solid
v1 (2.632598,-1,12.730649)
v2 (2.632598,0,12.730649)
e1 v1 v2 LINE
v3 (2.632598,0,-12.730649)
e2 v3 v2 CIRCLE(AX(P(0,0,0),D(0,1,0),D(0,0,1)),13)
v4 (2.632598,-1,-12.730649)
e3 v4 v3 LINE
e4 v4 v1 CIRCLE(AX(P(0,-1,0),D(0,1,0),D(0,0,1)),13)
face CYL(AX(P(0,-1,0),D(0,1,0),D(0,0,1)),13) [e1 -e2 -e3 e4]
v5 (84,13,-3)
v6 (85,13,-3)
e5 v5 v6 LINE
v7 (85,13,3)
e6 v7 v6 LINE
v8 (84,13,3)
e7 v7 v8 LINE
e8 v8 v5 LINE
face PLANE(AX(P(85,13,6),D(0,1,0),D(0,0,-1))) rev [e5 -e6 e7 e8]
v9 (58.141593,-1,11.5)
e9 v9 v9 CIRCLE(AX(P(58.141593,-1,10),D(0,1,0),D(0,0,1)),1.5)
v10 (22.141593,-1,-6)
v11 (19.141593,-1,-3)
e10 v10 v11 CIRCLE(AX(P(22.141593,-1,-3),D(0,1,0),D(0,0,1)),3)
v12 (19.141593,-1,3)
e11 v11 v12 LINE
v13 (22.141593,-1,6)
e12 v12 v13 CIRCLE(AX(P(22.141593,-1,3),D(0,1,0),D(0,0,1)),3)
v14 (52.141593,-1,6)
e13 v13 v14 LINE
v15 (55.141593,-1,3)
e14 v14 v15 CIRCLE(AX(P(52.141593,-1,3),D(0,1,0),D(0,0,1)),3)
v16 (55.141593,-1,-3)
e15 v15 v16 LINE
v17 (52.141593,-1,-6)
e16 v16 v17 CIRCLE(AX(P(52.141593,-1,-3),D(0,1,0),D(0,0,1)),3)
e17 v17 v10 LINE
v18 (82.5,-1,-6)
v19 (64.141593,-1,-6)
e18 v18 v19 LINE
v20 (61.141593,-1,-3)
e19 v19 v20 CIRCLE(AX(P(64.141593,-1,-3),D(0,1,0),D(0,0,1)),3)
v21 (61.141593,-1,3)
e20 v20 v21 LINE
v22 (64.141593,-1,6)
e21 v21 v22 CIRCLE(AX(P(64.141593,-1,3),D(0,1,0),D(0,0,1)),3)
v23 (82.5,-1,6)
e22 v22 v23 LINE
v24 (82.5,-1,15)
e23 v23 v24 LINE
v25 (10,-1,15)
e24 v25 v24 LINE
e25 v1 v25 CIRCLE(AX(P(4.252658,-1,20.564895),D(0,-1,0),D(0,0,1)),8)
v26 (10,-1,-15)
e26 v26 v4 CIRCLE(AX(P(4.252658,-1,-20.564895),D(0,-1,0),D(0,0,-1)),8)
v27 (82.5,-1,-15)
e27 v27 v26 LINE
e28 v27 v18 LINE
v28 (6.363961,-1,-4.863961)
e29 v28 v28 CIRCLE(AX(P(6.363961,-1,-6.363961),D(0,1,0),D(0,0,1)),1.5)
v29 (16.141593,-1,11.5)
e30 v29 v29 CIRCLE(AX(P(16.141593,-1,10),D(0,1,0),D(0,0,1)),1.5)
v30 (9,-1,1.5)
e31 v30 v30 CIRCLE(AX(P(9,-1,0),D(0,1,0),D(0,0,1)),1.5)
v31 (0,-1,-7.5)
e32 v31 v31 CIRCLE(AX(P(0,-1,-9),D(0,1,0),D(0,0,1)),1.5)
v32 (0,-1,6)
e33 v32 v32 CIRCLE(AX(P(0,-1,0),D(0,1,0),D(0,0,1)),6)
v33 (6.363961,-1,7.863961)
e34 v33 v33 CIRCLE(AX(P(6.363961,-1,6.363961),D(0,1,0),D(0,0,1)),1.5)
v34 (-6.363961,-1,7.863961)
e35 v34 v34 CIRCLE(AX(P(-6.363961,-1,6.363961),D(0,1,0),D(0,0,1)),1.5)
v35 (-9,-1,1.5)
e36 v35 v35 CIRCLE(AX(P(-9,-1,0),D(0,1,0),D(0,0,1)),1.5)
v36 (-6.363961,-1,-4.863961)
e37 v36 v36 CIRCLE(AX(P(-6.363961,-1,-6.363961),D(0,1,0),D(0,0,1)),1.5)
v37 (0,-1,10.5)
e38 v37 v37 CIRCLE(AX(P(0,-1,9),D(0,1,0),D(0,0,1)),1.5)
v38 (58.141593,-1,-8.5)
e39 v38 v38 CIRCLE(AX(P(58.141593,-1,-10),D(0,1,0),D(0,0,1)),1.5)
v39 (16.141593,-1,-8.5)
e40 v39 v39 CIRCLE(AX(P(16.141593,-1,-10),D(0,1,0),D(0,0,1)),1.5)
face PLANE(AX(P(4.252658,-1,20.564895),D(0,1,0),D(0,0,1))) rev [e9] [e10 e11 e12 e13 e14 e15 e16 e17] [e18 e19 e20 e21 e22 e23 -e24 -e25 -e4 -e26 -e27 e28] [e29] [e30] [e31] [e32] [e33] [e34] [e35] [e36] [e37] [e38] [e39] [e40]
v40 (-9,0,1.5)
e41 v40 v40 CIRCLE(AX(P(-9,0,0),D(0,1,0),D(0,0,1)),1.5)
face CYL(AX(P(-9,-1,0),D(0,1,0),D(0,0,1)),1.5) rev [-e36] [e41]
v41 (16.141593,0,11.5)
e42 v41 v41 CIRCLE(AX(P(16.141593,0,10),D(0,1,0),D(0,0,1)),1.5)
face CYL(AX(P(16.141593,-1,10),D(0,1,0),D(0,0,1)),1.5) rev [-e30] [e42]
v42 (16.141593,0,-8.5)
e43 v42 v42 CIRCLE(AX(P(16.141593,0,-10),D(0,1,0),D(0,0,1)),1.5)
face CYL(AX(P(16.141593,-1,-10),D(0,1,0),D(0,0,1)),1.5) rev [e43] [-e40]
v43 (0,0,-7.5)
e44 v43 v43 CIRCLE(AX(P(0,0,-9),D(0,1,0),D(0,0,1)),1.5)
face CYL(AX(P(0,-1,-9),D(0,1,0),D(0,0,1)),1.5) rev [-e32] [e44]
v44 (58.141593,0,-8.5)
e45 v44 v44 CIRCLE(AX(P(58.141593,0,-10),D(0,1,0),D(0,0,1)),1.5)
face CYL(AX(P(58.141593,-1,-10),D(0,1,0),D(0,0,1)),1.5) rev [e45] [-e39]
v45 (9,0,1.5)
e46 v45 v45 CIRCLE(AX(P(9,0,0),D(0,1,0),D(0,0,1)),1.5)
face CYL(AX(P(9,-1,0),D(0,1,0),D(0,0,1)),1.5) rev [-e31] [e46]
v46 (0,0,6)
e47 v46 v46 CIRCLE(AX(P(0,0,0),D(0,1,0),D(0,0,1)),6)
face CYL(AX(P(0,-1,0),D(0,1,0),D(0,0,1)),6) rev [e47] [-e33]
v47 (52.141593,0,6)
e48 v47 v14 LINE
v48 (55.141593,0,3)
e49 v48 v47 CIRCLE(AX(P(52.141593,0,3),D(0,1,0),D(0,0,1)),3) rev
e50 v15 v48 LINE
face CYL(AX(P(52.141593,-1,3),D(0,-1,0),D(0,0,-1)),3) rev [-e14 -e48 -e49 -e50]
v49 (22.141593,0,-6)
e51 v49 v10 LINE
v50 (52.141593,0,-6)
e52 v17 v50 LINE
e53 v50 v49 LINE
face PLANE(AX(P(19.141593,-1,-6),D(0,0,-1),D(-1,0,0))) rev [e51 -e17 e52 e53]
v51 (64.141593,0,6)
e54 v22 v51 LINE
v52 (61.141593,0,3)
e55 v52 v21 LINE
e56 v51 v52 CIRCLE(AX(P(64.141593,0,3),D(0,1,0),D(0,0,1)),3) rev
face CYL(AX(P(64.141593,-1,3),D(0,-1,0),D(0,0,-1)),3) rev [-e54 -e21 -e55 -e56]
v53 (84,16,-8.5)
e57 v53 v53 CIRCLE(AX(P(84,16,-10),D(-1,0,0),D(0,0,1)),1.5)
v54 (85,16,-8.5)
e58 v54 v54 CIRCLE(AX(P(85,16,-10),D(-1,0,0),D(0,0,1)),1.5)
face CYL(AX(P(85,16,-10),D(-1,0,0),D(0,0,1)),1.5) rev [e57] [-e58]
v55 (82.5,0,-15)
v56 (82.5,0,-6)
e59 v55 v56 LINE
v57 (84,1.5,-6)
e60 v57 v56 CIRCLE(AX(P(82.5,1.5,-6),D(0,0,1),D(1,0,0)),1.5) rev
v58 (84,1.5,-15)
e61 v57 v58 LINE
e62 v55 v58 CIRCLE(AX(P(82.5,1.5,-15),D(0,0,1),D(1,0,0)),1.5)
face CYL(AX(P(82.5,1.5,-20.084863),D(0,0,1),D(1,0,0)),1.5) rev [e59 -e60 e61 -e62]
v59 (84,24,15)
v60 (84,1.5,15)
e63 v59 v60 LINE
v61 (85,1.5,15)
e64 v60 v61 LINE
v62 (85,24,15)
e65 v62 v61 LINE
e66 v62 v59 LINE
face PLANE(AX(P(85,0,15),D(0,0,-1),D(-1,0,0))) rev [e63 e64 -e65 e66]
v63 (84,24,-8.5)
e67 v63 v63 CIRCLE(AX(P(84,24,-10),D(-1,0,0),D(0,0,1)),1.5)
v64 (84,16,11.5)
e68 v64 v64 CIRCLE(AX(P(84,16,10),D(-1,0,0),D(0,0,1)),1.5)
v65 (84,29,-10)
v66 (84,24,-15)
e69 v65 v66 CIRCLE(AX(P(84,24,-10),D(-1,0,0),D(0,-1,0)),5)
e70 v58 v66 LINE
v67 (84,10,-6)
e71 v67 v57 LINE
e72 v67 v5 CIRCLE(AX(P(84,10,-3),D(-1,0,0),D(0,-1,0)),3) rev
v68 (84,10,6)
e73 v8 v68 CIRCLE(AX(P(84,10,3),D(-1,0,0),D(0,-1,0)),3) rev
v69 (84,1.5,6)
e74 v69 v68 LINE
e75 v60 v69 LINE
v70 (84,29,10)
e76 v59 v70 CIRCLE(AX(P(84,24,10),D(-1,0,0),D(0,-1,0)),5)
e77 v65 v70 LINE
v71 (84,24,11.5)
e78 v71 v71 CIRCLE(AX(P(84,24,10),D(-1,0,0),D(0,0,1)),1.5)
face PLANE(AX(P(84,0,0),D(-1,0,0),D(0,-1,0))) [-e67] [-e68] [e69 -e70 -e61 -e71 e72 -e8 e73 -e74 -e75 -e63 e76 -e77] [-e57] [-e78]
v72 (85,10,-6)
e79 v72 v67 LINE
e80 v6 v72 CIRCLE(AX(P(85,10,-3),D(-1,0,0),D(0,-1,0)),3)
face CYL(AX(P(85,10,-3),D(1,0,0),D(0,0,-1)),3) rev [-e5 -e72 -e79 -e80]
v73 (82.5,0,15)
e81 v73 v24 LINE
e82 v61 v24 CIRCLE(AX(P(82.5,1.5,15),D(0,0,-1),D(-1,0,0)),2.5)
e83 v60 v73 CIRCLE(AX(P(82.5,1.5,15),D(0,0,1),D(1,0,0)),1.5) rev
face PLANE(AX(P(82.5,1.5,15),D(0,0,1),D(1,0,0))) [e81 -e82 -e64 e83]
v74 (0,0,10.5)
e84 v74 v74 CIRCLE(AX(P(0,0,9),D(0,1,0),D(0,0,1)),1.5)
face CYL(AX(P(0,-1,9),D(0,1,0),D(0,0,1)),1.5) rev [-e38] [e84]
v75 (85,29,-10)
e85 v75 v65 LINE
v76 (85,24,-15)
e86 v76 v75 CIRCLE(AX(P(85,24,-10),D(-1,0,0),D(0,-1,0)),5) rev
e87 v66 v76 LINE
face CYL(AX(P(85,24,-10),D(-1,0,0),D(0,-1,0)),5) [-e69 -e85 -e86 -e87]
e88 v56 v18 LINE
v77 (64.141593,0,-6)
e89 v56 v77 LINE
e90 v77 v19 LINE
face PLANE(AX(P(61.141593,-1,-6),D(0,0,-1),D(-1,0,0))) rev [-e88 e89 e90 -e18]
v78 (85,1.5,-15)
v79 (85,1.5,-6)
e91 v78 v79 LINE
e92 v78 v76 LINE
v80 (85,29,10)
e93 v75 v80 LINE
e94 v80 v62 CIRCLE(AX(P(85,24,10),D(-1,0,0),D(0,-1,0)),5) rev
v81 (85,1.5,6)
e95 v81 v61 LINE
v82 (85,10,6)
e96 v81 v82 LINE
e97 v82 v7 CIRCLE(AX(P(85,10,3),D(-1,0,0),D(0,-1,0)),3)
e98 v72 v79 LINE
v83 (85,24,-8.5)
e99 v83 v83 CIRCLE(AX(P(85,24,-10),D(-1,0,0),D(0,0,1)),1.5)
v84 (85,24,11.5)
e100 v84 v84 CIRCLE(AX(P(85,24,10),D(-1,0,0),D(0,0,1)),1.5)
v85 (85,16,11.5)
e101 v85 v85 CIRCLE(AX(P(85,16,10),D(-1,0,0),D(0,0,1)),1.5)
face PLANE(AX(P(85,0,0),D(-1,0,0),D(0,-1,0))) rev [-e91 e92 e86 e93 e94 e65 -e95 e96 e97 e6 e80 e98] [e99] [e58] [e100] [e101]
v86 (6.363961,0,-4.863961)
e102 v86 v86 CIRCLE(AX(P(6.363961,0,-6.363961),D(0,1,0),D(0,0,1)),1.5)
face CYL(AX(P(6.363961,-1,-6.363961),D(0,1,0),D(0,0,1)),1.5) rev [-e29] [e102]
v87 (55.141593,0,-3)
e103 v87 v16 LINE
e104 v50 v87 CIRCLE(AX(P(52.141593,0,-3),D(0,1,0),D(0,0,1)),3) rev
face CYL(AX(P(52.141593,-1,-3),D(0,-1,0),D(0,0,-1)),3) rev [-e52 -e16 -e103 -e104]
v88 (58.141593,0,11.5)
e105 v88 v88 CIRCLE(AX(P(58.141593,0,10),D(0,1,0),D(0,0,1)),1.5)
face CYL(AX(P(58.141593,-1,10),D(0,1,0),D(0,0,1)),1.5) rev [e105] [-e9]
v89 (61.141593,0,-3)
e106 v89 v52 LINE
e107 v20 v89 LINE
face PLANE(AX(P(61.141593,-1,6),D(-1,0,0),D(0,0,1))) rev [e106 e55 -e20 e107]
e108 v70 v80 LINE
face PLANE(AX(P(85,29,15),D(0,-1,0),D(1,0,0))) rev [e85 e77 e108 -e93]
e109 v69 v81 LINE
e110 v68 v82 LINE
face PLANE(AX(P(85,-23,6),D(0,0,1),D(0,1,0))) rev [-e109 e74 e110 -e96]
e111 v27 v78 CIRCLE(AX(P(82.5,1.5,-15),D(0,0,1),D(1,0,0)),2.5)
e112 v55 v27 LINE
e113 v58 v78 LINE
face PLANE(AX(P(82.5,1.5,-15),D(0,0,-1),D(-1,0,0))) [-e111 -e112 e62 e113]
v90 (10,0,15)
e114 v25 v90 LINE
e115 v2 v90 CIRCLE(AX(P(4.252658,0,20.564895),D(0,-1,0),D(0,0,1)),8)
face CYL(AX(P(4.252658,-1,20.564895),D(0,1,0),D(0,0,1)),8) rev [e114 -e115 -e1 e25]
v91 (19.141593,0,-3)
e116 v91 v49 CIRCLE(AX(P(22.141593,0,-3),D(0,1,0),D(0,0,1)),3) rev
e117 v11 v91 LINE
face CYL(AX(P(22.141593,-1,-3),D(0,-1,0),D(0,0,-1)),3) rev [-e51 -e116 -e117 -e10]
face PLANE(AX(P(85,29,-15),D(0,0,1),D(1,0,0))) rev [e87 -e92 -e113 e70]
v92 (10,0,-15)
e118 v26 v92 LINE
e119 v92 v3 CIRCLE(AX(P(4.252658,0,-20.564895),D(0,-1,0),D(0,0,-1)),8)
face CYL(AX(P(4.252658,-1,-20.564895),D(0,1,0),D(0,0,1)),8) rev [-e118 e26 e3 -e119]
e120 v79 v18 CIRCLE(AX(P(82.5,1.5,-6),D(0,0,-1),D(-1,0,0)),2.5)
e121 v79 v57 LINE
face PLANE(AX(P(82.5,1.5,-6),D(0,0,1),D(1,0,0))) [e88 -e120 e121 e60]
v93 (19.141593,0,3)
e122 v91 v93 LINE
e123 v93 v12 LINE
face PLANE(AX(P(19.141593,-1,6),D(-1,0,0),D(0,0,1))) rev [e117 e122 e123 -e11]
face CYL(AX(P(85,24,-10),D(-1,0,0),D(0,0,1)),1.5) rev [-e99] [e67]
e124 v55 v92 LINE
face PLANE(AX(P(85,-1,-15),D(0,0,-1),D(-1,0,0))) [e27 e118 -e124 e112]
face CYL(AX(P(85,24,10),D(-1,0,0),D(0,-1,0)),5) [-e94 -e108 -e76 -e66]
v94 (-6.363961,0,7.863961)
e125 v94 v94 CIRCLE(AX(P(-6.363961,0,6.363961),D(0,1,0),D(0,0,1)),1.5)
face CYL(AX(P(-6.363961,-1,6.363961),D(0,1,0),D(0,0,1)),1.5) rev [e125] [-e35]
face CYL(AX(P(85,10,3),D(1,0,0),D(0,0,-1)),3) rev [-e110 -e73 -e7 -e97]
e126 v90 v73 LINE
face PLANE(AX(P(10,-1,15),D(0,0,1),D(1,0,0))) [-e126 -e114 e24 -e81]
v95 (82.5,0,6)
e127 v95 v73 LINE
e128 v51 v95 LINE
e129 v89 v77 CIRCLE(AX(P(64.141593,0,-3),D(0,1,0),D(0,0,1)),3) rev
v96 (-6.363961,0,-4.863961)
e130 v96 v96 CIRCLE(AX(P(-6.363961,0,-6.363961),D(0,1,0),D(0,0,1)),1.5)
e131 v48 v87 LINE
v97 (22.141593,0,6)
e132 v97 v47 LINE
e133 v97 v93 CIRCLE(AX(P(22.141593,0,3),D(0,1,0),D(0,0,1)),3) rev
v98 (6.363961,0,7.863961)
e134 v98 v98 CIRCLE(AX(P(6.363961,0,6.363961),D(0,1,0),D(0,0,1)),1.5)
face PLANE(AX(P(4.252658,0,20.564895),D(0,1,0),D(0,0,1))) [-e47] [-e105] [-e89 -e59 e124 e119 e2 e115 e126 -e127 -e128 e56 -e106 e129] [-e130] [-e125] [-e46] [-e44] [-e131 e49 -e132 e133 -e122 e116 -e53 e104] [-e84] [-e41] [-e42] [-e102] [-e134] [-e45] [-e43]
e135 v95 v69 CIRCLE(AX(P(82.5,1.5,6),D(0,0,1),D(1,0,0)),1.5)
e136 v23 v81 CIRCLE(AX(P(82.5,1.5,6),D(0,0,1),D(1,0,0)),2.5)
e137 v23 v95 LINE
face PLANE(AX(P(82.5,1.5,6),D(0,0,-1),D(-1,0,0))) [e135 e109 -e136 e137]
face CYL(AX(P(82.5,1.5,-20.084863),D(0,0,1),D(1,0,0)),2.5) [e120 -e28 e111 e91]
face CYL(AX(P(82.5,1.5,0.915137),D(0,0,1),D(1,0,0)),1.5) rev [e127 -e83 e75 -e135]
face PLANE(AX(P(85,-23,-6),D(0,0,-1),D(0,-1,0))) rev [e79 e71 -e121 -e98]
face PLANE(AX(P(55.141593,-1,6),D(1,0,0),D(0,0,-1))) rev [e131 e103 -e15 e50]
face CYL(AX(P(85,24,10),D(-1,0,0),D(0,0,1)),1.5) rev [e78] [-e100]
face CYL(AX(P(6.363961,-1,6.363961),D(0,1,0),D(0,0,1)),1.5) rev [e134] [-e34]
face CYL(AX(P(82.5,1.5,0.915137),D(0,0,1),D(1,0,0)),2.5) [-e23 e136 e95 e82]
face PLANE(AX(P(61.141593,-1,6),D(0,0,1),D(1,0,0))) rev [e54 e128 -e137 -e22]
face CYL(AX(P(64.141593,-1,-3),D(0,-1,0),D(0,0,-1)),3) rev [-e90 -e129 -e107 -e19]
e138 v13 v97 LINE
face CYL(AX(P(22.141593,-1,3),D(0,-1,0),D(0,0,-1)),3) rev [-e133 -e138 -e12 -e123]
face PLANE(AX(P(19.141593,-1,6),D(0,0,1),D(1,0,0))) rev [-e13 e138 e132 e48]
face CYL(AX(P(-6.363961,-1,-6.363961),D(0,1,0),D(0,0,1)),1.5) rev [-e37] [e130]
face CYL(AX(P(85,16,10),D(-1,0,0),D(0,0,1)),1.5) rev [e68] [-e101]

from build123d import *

# Parameters (mm, degrees)
BASE_FLANGE1_DEPTH           = 1
EDGE_FLANGE1_STRIP_W         = 7
EDGE_FLANGE1_STRIP_H         = 1
EDGE_FLANGE1_STRIP_CUT_DEPTH = 30
EDGE_FLANGE1_DEPTH           = 30
FILLET1_R                    = 5
UNFOLD1_OUTLINE_W            = 3.141592654
UNFOLD1_OUTLINE_H            = 30
UNFOLD1_DEPTH                = 29
UNFOLD1_START                = -1
UNFOLD1_2_DEPTH              = 1
SKETCH10_R                   = 6
SKETCH10_R_2                 = 1.5
SKETCH10_W                   = 36
SKETCH10_H                   = 12
CUT_EXTRUDE1_DEPTH           = 10
FILLET2_R                    = 3
FOLD1_START                  = 84.74315
FOLD1_OUTLINE_W              = 1
FOLD1_OUTLINE_H              = 30
FOLD1_DEPTH                  = 28.398442654
FOLD1_START_2                = 82.5
FOLD1_2_OUTLINE_R            = 1.5
FOLD1_2_DEPTH                = 2.5
FOLD1_START_3                = -16
FOLD1_3_DEPTH                = 31


with BuildPart() as part:
    # Base-Flange1: sheet metal written as solids
    # Sketch1 → Base-Flange1 (new body)
    with BuildSketch(Plane(origin=(0, 0, 0), x_dir=(1, 0, 0), z_dir=(0, 1, 0))):
        with BuildLine():
            Line((10, -15), (85, -15))
            Line((85, -15), (85, 15))
            Line((85, 15), (10, 15))
            ThreePointArc((10, 15), (6.607674197, 12.919380101), (2.632597571, 12.730649238))
            ThreePointArc((2.632597571, 12.730649238), (-13, 0), (2.632597571, -12.730649238))
            ThreePointArc((2.632597571, -12.730649238), (6.607674197, -12.919380101), (10, -15))
        make_face()
    extrude(amount=-BASE_FLANGE1_DEPTH)

    # Edge-Flange1: sheet metal written as solids
    # Edge-Flange1 strip (on a plane across the edge) → Edge-Flange1 strip cut (cut)
    with BuildSketch(Plane(origin=(85, 0, 15), x_dir=(-1, 0, 0), z_dir=(0, 0, -1))):
        with Locations((-1, -0.5)):
            Rectangle(EDGE_FLANGE1_STRIP_W, EDGE_FLANGE1_STRIP_H)
    extrude(amount=EDGE_FLANGE1_STRIP_CUT_DEPTH, mode=Mode.SUBTRACT)

    # Edge-Flange1 section (on a plane across the edge) → Edge-Flange1 (add)
    with BuildSketch(Plane(origin=(85, 0, 15), x_dir=(-1, 0, 0), z_dir=(0, 0, -1))):
        with BuildLine():
            Line((0, 1.5), (0, 29))
            Line((0, 29), (1, 29))
            Line((1, 29), (1, 1.5))
            ThreePointArc((1, 1.5), (1.439339828, 0.439339828), (2.5, 0))
            Line((2.5, 0), (2.5, -1))
            ThreePointArc((2.5, -1), (0.732233047, -0.267766953), (0, 1.5))
        make_face()
    extrude(amount=EDGE_FLANGE1_DEPTH)

    # Fillet1
    fillet1_edges = [part.edges().sort_by_distance(p)[0] for p in [
        (84.5, 29, 15),
        (84.5, 29, -15),
    ]]
    fillet(fillet1_edges, radius=FILLET1_R)

    # Unfold1: read off the stored shape, not the designer's step
    # Unfold1 outline → Unfold1 (cut)
    with BuildSketch(Plane(origin=(0, 0, 0), x_dir=(1, 0, 0), z_dir=(0, 1, 0))):
        with Locations((84.070796327, 0)):
            Rectangle(UNFOLD1_OUTLINE_W, UNFOLD1_OUTLINE_H)
    extrude(amount=UNFOLD1_DEPTH, mode=Mode.SUBTRACT)

    # Unfold1 2 outline → Unfold1 2 (add)
    with BuildSketch(Plane(origin=(0, 0, 0), x_dir=(1, 0, 0), z_dir=(0, 1, 0)).offset(UNFOLD1_START)):
        with BuildLine():
            Line((108.141592654, 15), (82.5, 15))
            Line((82.5, 15), (82.5, -15))
            Line((82.5, -15), (108.141592654, -15))
            ThreePointArc((108.141592654, -15), (111.67712656, -13.535533906), (113.141592654, -10))
            Line((113.141592654, -10), (113.141592654, 10))
            ThreePointArc((113.141592654, 10), (111.67712656, 13.535533906), (108.141592654, 15))
        make_face()
    extrude(amount=UNFOLD1_2_DEPTH)

    # Sketch10 → Cut-Extrude1 (cut)
    with BuildSketch(Plane(origin=(0, 0, 0), x_dir=(1, 0, 0), z_dir=(0, 1, 0))):
        with Locations(Location((0, 0, 0), (0, 0, 270))):
            Circle(SKETCH10_R)
        with Locations(Location((0, 9, 0), (0, 0, 270))):
            Circle(SKETCH10_R_2)
        with Locations(Location((6.363961031, 6.363961031, 0), (0, 0, 270))):
            Circle(SKETCH10_R_2)
        with Locations(Location((9, 0, 0), (0, 0, 270))):
            Circle(SKETCH10_R_2)
        with Locations(Location((6.363961031, -6.363961031, 0), (0, 0, 270))):
            Circle(SKETCH10_R_2)
        with Locations(Location((0, -9, 0), (0, 0, 270))):
            Circle(SKETCH10_R_2)
        with Locations(Location((-6.363961031, -6.363961031, 0), (0, 0, 270))):
            Circle(SKETCH10_R_2)
        with Locations(Location((-9, 0, 0), (0, 0, 270))):
            Circle(SKETCH10_R_2)
        with Locations(Location((-6.363961031, 6.363961031, 0), (0, 0, 270))):
            Circle(SKETCH10_R_2)
        with Locations(Location((16.141592654, 10, 0), (0, 0, 270))):
            Circle(SKETCH10_R_2)
        with Locations(Location((16.141592654, -10, 0), (0, 0, 270))):
            Circle(SKETCH10_R_2)
        with Locations(Location((58.141592654, 10, 0), (0, 0, 270))):
            Circle(SKETCH10_R_2)
        with Locations(Location((58.141592654, -10, 0), (0, 0, 270))):
            Circle(SKETCH10_R_2)
        with Locations(Location((100.141592654, 10, 0), (0, 0, 270))):
            Circle(SKETCH10_R_2)
        with Locations(Location((108.141592654, 10, 0), (0, 0, 270))):
            Circle(SKETCH10_R_2)
        with Locations(Location((100.141592654, -10, 0), (0, 0, 270))):
            Circle(SKETCH10_R_2)
        with Locations(Location((108.141592654, -10, 0), (0, 0, 270))):
            Circle(SKETCH10_R_2)
        with Locations((37.141592654, 0)):
            Rectangle(SKETCH10_W, SKETCH10_H)
        with Locations((79.141592654, 0)):
            Rectangle(SKETCH10_W, SKETCH10_H)
    extrude(amount=-CUT_EXTRUDE1_DEPTH, mode=Mode.SUBTRACT)

    # Fillet2
    fillet2_edges = [part.edges().sort_by_distance(p)[0] for p in [
        (97.141592654, -0.5, -6),
        (97.141592654, -0.5, 6),
        (61.141592654, -0.5, 6),
        (61.141592654, -0.5, -6),
        (55.141592654, -0.5, -6),
        (55.141592654, -0.5, 6),
        (19.141592654, -0.5, 6),
        (19.141592654, -0.5, -6),
    ]]
    fillet(fillet2_edges, radius=FILLET2_R)

    # Fold1: read off the stored shape, not the designer's step
    # Fold1 outline → Fold1 (cut)
    with BuildSketch(Plane.YZ.offset(FOLD1_START)):
        with Locations((-0.5, 0)):
            Rectangle(FOLD1_OUTLINE_W, FOLD1_OUTLINE_H)
    extrude(amount=FOLD1_DEPTH, mode=Mode.SUBTRACT)

    # Fold1 2 outline → Fold1 2 (add)
    with BuildSketch(Plane.YZ.offset(FOLD1_START_2)):
        with BuildLine():
            Line((10, -6), (0, -6))
            Line((0, -6), (0, -15))
            Line((0, -15), (24, -15))
            ThreePointArc((24, -15), (27.535533906, -13.535533906), (29, -10))
            Line((29, -10), (29, 10))
            ThreePointArc((29, 10), (27.535533906, 13.535533906), (24, 15))
            Line((24, 15), (0, 15))
            Line((0, 15), (0, 6))
            Line((0, 6), (10, 6))
            ThreePointArc((10, 6), (12.121320344, 5.121320344), (13, 3))
            Line((13, 3), (13, -3))
            ThreePointArc((13, -3), (12.121320344, -5.121320344), (10, -6))
        make_face()
        with Locations((16, -10)):
            Circle(FOLD1_2_OUTLINE_R, mode=Mode.SUBTRACT)
        with Locations((24, -10)):
            Circle(FOLD1_2_OUTLINE_R, mode=Mode.SUBTRACT)
        with Locations((16, 10)):
            Circle(FOLD1_2_OUTLINE_R, mode=Mode.SUBTRACT)
        with Locations((24, 10)):
            Circle(FOLD1_2_OUTLINE_R, mode=Mode.SUBTRACT)
    extrude(amount=FOLD1_2_DEPTH)

    # Fold1 3 outline → Fold1 3 (cut)
    with BuildSketch(Plane.XY.offset(FOLD1_START_3)):
        with BuildLine():
            Line((84, 29), (82.5, 29))
            Line((82.5, 29), (82.5, 0))
            ThreePointArc((82.5, 0), (83.560660172, 0.439339828), (84, 1.5))
            Line((84, 1.5), (84, 29))
        make_face()
        with BuildLine():
            Line((85, 0), (85, 1.5))
            ThreePointArc((85, 1.5), (84.267766953, -0.267766953), (82.5, -1))
            Line((82.5, -1), (84.74315, -1))
            Line((84.74315, -1), (84.74315, 0))
            Line((84.74315, 0), (85, 0))
        make_face()
    extrude(amount=FOLD1_3_DEPTH, mode=Mode.SUBTRACT)


solid = part.part
